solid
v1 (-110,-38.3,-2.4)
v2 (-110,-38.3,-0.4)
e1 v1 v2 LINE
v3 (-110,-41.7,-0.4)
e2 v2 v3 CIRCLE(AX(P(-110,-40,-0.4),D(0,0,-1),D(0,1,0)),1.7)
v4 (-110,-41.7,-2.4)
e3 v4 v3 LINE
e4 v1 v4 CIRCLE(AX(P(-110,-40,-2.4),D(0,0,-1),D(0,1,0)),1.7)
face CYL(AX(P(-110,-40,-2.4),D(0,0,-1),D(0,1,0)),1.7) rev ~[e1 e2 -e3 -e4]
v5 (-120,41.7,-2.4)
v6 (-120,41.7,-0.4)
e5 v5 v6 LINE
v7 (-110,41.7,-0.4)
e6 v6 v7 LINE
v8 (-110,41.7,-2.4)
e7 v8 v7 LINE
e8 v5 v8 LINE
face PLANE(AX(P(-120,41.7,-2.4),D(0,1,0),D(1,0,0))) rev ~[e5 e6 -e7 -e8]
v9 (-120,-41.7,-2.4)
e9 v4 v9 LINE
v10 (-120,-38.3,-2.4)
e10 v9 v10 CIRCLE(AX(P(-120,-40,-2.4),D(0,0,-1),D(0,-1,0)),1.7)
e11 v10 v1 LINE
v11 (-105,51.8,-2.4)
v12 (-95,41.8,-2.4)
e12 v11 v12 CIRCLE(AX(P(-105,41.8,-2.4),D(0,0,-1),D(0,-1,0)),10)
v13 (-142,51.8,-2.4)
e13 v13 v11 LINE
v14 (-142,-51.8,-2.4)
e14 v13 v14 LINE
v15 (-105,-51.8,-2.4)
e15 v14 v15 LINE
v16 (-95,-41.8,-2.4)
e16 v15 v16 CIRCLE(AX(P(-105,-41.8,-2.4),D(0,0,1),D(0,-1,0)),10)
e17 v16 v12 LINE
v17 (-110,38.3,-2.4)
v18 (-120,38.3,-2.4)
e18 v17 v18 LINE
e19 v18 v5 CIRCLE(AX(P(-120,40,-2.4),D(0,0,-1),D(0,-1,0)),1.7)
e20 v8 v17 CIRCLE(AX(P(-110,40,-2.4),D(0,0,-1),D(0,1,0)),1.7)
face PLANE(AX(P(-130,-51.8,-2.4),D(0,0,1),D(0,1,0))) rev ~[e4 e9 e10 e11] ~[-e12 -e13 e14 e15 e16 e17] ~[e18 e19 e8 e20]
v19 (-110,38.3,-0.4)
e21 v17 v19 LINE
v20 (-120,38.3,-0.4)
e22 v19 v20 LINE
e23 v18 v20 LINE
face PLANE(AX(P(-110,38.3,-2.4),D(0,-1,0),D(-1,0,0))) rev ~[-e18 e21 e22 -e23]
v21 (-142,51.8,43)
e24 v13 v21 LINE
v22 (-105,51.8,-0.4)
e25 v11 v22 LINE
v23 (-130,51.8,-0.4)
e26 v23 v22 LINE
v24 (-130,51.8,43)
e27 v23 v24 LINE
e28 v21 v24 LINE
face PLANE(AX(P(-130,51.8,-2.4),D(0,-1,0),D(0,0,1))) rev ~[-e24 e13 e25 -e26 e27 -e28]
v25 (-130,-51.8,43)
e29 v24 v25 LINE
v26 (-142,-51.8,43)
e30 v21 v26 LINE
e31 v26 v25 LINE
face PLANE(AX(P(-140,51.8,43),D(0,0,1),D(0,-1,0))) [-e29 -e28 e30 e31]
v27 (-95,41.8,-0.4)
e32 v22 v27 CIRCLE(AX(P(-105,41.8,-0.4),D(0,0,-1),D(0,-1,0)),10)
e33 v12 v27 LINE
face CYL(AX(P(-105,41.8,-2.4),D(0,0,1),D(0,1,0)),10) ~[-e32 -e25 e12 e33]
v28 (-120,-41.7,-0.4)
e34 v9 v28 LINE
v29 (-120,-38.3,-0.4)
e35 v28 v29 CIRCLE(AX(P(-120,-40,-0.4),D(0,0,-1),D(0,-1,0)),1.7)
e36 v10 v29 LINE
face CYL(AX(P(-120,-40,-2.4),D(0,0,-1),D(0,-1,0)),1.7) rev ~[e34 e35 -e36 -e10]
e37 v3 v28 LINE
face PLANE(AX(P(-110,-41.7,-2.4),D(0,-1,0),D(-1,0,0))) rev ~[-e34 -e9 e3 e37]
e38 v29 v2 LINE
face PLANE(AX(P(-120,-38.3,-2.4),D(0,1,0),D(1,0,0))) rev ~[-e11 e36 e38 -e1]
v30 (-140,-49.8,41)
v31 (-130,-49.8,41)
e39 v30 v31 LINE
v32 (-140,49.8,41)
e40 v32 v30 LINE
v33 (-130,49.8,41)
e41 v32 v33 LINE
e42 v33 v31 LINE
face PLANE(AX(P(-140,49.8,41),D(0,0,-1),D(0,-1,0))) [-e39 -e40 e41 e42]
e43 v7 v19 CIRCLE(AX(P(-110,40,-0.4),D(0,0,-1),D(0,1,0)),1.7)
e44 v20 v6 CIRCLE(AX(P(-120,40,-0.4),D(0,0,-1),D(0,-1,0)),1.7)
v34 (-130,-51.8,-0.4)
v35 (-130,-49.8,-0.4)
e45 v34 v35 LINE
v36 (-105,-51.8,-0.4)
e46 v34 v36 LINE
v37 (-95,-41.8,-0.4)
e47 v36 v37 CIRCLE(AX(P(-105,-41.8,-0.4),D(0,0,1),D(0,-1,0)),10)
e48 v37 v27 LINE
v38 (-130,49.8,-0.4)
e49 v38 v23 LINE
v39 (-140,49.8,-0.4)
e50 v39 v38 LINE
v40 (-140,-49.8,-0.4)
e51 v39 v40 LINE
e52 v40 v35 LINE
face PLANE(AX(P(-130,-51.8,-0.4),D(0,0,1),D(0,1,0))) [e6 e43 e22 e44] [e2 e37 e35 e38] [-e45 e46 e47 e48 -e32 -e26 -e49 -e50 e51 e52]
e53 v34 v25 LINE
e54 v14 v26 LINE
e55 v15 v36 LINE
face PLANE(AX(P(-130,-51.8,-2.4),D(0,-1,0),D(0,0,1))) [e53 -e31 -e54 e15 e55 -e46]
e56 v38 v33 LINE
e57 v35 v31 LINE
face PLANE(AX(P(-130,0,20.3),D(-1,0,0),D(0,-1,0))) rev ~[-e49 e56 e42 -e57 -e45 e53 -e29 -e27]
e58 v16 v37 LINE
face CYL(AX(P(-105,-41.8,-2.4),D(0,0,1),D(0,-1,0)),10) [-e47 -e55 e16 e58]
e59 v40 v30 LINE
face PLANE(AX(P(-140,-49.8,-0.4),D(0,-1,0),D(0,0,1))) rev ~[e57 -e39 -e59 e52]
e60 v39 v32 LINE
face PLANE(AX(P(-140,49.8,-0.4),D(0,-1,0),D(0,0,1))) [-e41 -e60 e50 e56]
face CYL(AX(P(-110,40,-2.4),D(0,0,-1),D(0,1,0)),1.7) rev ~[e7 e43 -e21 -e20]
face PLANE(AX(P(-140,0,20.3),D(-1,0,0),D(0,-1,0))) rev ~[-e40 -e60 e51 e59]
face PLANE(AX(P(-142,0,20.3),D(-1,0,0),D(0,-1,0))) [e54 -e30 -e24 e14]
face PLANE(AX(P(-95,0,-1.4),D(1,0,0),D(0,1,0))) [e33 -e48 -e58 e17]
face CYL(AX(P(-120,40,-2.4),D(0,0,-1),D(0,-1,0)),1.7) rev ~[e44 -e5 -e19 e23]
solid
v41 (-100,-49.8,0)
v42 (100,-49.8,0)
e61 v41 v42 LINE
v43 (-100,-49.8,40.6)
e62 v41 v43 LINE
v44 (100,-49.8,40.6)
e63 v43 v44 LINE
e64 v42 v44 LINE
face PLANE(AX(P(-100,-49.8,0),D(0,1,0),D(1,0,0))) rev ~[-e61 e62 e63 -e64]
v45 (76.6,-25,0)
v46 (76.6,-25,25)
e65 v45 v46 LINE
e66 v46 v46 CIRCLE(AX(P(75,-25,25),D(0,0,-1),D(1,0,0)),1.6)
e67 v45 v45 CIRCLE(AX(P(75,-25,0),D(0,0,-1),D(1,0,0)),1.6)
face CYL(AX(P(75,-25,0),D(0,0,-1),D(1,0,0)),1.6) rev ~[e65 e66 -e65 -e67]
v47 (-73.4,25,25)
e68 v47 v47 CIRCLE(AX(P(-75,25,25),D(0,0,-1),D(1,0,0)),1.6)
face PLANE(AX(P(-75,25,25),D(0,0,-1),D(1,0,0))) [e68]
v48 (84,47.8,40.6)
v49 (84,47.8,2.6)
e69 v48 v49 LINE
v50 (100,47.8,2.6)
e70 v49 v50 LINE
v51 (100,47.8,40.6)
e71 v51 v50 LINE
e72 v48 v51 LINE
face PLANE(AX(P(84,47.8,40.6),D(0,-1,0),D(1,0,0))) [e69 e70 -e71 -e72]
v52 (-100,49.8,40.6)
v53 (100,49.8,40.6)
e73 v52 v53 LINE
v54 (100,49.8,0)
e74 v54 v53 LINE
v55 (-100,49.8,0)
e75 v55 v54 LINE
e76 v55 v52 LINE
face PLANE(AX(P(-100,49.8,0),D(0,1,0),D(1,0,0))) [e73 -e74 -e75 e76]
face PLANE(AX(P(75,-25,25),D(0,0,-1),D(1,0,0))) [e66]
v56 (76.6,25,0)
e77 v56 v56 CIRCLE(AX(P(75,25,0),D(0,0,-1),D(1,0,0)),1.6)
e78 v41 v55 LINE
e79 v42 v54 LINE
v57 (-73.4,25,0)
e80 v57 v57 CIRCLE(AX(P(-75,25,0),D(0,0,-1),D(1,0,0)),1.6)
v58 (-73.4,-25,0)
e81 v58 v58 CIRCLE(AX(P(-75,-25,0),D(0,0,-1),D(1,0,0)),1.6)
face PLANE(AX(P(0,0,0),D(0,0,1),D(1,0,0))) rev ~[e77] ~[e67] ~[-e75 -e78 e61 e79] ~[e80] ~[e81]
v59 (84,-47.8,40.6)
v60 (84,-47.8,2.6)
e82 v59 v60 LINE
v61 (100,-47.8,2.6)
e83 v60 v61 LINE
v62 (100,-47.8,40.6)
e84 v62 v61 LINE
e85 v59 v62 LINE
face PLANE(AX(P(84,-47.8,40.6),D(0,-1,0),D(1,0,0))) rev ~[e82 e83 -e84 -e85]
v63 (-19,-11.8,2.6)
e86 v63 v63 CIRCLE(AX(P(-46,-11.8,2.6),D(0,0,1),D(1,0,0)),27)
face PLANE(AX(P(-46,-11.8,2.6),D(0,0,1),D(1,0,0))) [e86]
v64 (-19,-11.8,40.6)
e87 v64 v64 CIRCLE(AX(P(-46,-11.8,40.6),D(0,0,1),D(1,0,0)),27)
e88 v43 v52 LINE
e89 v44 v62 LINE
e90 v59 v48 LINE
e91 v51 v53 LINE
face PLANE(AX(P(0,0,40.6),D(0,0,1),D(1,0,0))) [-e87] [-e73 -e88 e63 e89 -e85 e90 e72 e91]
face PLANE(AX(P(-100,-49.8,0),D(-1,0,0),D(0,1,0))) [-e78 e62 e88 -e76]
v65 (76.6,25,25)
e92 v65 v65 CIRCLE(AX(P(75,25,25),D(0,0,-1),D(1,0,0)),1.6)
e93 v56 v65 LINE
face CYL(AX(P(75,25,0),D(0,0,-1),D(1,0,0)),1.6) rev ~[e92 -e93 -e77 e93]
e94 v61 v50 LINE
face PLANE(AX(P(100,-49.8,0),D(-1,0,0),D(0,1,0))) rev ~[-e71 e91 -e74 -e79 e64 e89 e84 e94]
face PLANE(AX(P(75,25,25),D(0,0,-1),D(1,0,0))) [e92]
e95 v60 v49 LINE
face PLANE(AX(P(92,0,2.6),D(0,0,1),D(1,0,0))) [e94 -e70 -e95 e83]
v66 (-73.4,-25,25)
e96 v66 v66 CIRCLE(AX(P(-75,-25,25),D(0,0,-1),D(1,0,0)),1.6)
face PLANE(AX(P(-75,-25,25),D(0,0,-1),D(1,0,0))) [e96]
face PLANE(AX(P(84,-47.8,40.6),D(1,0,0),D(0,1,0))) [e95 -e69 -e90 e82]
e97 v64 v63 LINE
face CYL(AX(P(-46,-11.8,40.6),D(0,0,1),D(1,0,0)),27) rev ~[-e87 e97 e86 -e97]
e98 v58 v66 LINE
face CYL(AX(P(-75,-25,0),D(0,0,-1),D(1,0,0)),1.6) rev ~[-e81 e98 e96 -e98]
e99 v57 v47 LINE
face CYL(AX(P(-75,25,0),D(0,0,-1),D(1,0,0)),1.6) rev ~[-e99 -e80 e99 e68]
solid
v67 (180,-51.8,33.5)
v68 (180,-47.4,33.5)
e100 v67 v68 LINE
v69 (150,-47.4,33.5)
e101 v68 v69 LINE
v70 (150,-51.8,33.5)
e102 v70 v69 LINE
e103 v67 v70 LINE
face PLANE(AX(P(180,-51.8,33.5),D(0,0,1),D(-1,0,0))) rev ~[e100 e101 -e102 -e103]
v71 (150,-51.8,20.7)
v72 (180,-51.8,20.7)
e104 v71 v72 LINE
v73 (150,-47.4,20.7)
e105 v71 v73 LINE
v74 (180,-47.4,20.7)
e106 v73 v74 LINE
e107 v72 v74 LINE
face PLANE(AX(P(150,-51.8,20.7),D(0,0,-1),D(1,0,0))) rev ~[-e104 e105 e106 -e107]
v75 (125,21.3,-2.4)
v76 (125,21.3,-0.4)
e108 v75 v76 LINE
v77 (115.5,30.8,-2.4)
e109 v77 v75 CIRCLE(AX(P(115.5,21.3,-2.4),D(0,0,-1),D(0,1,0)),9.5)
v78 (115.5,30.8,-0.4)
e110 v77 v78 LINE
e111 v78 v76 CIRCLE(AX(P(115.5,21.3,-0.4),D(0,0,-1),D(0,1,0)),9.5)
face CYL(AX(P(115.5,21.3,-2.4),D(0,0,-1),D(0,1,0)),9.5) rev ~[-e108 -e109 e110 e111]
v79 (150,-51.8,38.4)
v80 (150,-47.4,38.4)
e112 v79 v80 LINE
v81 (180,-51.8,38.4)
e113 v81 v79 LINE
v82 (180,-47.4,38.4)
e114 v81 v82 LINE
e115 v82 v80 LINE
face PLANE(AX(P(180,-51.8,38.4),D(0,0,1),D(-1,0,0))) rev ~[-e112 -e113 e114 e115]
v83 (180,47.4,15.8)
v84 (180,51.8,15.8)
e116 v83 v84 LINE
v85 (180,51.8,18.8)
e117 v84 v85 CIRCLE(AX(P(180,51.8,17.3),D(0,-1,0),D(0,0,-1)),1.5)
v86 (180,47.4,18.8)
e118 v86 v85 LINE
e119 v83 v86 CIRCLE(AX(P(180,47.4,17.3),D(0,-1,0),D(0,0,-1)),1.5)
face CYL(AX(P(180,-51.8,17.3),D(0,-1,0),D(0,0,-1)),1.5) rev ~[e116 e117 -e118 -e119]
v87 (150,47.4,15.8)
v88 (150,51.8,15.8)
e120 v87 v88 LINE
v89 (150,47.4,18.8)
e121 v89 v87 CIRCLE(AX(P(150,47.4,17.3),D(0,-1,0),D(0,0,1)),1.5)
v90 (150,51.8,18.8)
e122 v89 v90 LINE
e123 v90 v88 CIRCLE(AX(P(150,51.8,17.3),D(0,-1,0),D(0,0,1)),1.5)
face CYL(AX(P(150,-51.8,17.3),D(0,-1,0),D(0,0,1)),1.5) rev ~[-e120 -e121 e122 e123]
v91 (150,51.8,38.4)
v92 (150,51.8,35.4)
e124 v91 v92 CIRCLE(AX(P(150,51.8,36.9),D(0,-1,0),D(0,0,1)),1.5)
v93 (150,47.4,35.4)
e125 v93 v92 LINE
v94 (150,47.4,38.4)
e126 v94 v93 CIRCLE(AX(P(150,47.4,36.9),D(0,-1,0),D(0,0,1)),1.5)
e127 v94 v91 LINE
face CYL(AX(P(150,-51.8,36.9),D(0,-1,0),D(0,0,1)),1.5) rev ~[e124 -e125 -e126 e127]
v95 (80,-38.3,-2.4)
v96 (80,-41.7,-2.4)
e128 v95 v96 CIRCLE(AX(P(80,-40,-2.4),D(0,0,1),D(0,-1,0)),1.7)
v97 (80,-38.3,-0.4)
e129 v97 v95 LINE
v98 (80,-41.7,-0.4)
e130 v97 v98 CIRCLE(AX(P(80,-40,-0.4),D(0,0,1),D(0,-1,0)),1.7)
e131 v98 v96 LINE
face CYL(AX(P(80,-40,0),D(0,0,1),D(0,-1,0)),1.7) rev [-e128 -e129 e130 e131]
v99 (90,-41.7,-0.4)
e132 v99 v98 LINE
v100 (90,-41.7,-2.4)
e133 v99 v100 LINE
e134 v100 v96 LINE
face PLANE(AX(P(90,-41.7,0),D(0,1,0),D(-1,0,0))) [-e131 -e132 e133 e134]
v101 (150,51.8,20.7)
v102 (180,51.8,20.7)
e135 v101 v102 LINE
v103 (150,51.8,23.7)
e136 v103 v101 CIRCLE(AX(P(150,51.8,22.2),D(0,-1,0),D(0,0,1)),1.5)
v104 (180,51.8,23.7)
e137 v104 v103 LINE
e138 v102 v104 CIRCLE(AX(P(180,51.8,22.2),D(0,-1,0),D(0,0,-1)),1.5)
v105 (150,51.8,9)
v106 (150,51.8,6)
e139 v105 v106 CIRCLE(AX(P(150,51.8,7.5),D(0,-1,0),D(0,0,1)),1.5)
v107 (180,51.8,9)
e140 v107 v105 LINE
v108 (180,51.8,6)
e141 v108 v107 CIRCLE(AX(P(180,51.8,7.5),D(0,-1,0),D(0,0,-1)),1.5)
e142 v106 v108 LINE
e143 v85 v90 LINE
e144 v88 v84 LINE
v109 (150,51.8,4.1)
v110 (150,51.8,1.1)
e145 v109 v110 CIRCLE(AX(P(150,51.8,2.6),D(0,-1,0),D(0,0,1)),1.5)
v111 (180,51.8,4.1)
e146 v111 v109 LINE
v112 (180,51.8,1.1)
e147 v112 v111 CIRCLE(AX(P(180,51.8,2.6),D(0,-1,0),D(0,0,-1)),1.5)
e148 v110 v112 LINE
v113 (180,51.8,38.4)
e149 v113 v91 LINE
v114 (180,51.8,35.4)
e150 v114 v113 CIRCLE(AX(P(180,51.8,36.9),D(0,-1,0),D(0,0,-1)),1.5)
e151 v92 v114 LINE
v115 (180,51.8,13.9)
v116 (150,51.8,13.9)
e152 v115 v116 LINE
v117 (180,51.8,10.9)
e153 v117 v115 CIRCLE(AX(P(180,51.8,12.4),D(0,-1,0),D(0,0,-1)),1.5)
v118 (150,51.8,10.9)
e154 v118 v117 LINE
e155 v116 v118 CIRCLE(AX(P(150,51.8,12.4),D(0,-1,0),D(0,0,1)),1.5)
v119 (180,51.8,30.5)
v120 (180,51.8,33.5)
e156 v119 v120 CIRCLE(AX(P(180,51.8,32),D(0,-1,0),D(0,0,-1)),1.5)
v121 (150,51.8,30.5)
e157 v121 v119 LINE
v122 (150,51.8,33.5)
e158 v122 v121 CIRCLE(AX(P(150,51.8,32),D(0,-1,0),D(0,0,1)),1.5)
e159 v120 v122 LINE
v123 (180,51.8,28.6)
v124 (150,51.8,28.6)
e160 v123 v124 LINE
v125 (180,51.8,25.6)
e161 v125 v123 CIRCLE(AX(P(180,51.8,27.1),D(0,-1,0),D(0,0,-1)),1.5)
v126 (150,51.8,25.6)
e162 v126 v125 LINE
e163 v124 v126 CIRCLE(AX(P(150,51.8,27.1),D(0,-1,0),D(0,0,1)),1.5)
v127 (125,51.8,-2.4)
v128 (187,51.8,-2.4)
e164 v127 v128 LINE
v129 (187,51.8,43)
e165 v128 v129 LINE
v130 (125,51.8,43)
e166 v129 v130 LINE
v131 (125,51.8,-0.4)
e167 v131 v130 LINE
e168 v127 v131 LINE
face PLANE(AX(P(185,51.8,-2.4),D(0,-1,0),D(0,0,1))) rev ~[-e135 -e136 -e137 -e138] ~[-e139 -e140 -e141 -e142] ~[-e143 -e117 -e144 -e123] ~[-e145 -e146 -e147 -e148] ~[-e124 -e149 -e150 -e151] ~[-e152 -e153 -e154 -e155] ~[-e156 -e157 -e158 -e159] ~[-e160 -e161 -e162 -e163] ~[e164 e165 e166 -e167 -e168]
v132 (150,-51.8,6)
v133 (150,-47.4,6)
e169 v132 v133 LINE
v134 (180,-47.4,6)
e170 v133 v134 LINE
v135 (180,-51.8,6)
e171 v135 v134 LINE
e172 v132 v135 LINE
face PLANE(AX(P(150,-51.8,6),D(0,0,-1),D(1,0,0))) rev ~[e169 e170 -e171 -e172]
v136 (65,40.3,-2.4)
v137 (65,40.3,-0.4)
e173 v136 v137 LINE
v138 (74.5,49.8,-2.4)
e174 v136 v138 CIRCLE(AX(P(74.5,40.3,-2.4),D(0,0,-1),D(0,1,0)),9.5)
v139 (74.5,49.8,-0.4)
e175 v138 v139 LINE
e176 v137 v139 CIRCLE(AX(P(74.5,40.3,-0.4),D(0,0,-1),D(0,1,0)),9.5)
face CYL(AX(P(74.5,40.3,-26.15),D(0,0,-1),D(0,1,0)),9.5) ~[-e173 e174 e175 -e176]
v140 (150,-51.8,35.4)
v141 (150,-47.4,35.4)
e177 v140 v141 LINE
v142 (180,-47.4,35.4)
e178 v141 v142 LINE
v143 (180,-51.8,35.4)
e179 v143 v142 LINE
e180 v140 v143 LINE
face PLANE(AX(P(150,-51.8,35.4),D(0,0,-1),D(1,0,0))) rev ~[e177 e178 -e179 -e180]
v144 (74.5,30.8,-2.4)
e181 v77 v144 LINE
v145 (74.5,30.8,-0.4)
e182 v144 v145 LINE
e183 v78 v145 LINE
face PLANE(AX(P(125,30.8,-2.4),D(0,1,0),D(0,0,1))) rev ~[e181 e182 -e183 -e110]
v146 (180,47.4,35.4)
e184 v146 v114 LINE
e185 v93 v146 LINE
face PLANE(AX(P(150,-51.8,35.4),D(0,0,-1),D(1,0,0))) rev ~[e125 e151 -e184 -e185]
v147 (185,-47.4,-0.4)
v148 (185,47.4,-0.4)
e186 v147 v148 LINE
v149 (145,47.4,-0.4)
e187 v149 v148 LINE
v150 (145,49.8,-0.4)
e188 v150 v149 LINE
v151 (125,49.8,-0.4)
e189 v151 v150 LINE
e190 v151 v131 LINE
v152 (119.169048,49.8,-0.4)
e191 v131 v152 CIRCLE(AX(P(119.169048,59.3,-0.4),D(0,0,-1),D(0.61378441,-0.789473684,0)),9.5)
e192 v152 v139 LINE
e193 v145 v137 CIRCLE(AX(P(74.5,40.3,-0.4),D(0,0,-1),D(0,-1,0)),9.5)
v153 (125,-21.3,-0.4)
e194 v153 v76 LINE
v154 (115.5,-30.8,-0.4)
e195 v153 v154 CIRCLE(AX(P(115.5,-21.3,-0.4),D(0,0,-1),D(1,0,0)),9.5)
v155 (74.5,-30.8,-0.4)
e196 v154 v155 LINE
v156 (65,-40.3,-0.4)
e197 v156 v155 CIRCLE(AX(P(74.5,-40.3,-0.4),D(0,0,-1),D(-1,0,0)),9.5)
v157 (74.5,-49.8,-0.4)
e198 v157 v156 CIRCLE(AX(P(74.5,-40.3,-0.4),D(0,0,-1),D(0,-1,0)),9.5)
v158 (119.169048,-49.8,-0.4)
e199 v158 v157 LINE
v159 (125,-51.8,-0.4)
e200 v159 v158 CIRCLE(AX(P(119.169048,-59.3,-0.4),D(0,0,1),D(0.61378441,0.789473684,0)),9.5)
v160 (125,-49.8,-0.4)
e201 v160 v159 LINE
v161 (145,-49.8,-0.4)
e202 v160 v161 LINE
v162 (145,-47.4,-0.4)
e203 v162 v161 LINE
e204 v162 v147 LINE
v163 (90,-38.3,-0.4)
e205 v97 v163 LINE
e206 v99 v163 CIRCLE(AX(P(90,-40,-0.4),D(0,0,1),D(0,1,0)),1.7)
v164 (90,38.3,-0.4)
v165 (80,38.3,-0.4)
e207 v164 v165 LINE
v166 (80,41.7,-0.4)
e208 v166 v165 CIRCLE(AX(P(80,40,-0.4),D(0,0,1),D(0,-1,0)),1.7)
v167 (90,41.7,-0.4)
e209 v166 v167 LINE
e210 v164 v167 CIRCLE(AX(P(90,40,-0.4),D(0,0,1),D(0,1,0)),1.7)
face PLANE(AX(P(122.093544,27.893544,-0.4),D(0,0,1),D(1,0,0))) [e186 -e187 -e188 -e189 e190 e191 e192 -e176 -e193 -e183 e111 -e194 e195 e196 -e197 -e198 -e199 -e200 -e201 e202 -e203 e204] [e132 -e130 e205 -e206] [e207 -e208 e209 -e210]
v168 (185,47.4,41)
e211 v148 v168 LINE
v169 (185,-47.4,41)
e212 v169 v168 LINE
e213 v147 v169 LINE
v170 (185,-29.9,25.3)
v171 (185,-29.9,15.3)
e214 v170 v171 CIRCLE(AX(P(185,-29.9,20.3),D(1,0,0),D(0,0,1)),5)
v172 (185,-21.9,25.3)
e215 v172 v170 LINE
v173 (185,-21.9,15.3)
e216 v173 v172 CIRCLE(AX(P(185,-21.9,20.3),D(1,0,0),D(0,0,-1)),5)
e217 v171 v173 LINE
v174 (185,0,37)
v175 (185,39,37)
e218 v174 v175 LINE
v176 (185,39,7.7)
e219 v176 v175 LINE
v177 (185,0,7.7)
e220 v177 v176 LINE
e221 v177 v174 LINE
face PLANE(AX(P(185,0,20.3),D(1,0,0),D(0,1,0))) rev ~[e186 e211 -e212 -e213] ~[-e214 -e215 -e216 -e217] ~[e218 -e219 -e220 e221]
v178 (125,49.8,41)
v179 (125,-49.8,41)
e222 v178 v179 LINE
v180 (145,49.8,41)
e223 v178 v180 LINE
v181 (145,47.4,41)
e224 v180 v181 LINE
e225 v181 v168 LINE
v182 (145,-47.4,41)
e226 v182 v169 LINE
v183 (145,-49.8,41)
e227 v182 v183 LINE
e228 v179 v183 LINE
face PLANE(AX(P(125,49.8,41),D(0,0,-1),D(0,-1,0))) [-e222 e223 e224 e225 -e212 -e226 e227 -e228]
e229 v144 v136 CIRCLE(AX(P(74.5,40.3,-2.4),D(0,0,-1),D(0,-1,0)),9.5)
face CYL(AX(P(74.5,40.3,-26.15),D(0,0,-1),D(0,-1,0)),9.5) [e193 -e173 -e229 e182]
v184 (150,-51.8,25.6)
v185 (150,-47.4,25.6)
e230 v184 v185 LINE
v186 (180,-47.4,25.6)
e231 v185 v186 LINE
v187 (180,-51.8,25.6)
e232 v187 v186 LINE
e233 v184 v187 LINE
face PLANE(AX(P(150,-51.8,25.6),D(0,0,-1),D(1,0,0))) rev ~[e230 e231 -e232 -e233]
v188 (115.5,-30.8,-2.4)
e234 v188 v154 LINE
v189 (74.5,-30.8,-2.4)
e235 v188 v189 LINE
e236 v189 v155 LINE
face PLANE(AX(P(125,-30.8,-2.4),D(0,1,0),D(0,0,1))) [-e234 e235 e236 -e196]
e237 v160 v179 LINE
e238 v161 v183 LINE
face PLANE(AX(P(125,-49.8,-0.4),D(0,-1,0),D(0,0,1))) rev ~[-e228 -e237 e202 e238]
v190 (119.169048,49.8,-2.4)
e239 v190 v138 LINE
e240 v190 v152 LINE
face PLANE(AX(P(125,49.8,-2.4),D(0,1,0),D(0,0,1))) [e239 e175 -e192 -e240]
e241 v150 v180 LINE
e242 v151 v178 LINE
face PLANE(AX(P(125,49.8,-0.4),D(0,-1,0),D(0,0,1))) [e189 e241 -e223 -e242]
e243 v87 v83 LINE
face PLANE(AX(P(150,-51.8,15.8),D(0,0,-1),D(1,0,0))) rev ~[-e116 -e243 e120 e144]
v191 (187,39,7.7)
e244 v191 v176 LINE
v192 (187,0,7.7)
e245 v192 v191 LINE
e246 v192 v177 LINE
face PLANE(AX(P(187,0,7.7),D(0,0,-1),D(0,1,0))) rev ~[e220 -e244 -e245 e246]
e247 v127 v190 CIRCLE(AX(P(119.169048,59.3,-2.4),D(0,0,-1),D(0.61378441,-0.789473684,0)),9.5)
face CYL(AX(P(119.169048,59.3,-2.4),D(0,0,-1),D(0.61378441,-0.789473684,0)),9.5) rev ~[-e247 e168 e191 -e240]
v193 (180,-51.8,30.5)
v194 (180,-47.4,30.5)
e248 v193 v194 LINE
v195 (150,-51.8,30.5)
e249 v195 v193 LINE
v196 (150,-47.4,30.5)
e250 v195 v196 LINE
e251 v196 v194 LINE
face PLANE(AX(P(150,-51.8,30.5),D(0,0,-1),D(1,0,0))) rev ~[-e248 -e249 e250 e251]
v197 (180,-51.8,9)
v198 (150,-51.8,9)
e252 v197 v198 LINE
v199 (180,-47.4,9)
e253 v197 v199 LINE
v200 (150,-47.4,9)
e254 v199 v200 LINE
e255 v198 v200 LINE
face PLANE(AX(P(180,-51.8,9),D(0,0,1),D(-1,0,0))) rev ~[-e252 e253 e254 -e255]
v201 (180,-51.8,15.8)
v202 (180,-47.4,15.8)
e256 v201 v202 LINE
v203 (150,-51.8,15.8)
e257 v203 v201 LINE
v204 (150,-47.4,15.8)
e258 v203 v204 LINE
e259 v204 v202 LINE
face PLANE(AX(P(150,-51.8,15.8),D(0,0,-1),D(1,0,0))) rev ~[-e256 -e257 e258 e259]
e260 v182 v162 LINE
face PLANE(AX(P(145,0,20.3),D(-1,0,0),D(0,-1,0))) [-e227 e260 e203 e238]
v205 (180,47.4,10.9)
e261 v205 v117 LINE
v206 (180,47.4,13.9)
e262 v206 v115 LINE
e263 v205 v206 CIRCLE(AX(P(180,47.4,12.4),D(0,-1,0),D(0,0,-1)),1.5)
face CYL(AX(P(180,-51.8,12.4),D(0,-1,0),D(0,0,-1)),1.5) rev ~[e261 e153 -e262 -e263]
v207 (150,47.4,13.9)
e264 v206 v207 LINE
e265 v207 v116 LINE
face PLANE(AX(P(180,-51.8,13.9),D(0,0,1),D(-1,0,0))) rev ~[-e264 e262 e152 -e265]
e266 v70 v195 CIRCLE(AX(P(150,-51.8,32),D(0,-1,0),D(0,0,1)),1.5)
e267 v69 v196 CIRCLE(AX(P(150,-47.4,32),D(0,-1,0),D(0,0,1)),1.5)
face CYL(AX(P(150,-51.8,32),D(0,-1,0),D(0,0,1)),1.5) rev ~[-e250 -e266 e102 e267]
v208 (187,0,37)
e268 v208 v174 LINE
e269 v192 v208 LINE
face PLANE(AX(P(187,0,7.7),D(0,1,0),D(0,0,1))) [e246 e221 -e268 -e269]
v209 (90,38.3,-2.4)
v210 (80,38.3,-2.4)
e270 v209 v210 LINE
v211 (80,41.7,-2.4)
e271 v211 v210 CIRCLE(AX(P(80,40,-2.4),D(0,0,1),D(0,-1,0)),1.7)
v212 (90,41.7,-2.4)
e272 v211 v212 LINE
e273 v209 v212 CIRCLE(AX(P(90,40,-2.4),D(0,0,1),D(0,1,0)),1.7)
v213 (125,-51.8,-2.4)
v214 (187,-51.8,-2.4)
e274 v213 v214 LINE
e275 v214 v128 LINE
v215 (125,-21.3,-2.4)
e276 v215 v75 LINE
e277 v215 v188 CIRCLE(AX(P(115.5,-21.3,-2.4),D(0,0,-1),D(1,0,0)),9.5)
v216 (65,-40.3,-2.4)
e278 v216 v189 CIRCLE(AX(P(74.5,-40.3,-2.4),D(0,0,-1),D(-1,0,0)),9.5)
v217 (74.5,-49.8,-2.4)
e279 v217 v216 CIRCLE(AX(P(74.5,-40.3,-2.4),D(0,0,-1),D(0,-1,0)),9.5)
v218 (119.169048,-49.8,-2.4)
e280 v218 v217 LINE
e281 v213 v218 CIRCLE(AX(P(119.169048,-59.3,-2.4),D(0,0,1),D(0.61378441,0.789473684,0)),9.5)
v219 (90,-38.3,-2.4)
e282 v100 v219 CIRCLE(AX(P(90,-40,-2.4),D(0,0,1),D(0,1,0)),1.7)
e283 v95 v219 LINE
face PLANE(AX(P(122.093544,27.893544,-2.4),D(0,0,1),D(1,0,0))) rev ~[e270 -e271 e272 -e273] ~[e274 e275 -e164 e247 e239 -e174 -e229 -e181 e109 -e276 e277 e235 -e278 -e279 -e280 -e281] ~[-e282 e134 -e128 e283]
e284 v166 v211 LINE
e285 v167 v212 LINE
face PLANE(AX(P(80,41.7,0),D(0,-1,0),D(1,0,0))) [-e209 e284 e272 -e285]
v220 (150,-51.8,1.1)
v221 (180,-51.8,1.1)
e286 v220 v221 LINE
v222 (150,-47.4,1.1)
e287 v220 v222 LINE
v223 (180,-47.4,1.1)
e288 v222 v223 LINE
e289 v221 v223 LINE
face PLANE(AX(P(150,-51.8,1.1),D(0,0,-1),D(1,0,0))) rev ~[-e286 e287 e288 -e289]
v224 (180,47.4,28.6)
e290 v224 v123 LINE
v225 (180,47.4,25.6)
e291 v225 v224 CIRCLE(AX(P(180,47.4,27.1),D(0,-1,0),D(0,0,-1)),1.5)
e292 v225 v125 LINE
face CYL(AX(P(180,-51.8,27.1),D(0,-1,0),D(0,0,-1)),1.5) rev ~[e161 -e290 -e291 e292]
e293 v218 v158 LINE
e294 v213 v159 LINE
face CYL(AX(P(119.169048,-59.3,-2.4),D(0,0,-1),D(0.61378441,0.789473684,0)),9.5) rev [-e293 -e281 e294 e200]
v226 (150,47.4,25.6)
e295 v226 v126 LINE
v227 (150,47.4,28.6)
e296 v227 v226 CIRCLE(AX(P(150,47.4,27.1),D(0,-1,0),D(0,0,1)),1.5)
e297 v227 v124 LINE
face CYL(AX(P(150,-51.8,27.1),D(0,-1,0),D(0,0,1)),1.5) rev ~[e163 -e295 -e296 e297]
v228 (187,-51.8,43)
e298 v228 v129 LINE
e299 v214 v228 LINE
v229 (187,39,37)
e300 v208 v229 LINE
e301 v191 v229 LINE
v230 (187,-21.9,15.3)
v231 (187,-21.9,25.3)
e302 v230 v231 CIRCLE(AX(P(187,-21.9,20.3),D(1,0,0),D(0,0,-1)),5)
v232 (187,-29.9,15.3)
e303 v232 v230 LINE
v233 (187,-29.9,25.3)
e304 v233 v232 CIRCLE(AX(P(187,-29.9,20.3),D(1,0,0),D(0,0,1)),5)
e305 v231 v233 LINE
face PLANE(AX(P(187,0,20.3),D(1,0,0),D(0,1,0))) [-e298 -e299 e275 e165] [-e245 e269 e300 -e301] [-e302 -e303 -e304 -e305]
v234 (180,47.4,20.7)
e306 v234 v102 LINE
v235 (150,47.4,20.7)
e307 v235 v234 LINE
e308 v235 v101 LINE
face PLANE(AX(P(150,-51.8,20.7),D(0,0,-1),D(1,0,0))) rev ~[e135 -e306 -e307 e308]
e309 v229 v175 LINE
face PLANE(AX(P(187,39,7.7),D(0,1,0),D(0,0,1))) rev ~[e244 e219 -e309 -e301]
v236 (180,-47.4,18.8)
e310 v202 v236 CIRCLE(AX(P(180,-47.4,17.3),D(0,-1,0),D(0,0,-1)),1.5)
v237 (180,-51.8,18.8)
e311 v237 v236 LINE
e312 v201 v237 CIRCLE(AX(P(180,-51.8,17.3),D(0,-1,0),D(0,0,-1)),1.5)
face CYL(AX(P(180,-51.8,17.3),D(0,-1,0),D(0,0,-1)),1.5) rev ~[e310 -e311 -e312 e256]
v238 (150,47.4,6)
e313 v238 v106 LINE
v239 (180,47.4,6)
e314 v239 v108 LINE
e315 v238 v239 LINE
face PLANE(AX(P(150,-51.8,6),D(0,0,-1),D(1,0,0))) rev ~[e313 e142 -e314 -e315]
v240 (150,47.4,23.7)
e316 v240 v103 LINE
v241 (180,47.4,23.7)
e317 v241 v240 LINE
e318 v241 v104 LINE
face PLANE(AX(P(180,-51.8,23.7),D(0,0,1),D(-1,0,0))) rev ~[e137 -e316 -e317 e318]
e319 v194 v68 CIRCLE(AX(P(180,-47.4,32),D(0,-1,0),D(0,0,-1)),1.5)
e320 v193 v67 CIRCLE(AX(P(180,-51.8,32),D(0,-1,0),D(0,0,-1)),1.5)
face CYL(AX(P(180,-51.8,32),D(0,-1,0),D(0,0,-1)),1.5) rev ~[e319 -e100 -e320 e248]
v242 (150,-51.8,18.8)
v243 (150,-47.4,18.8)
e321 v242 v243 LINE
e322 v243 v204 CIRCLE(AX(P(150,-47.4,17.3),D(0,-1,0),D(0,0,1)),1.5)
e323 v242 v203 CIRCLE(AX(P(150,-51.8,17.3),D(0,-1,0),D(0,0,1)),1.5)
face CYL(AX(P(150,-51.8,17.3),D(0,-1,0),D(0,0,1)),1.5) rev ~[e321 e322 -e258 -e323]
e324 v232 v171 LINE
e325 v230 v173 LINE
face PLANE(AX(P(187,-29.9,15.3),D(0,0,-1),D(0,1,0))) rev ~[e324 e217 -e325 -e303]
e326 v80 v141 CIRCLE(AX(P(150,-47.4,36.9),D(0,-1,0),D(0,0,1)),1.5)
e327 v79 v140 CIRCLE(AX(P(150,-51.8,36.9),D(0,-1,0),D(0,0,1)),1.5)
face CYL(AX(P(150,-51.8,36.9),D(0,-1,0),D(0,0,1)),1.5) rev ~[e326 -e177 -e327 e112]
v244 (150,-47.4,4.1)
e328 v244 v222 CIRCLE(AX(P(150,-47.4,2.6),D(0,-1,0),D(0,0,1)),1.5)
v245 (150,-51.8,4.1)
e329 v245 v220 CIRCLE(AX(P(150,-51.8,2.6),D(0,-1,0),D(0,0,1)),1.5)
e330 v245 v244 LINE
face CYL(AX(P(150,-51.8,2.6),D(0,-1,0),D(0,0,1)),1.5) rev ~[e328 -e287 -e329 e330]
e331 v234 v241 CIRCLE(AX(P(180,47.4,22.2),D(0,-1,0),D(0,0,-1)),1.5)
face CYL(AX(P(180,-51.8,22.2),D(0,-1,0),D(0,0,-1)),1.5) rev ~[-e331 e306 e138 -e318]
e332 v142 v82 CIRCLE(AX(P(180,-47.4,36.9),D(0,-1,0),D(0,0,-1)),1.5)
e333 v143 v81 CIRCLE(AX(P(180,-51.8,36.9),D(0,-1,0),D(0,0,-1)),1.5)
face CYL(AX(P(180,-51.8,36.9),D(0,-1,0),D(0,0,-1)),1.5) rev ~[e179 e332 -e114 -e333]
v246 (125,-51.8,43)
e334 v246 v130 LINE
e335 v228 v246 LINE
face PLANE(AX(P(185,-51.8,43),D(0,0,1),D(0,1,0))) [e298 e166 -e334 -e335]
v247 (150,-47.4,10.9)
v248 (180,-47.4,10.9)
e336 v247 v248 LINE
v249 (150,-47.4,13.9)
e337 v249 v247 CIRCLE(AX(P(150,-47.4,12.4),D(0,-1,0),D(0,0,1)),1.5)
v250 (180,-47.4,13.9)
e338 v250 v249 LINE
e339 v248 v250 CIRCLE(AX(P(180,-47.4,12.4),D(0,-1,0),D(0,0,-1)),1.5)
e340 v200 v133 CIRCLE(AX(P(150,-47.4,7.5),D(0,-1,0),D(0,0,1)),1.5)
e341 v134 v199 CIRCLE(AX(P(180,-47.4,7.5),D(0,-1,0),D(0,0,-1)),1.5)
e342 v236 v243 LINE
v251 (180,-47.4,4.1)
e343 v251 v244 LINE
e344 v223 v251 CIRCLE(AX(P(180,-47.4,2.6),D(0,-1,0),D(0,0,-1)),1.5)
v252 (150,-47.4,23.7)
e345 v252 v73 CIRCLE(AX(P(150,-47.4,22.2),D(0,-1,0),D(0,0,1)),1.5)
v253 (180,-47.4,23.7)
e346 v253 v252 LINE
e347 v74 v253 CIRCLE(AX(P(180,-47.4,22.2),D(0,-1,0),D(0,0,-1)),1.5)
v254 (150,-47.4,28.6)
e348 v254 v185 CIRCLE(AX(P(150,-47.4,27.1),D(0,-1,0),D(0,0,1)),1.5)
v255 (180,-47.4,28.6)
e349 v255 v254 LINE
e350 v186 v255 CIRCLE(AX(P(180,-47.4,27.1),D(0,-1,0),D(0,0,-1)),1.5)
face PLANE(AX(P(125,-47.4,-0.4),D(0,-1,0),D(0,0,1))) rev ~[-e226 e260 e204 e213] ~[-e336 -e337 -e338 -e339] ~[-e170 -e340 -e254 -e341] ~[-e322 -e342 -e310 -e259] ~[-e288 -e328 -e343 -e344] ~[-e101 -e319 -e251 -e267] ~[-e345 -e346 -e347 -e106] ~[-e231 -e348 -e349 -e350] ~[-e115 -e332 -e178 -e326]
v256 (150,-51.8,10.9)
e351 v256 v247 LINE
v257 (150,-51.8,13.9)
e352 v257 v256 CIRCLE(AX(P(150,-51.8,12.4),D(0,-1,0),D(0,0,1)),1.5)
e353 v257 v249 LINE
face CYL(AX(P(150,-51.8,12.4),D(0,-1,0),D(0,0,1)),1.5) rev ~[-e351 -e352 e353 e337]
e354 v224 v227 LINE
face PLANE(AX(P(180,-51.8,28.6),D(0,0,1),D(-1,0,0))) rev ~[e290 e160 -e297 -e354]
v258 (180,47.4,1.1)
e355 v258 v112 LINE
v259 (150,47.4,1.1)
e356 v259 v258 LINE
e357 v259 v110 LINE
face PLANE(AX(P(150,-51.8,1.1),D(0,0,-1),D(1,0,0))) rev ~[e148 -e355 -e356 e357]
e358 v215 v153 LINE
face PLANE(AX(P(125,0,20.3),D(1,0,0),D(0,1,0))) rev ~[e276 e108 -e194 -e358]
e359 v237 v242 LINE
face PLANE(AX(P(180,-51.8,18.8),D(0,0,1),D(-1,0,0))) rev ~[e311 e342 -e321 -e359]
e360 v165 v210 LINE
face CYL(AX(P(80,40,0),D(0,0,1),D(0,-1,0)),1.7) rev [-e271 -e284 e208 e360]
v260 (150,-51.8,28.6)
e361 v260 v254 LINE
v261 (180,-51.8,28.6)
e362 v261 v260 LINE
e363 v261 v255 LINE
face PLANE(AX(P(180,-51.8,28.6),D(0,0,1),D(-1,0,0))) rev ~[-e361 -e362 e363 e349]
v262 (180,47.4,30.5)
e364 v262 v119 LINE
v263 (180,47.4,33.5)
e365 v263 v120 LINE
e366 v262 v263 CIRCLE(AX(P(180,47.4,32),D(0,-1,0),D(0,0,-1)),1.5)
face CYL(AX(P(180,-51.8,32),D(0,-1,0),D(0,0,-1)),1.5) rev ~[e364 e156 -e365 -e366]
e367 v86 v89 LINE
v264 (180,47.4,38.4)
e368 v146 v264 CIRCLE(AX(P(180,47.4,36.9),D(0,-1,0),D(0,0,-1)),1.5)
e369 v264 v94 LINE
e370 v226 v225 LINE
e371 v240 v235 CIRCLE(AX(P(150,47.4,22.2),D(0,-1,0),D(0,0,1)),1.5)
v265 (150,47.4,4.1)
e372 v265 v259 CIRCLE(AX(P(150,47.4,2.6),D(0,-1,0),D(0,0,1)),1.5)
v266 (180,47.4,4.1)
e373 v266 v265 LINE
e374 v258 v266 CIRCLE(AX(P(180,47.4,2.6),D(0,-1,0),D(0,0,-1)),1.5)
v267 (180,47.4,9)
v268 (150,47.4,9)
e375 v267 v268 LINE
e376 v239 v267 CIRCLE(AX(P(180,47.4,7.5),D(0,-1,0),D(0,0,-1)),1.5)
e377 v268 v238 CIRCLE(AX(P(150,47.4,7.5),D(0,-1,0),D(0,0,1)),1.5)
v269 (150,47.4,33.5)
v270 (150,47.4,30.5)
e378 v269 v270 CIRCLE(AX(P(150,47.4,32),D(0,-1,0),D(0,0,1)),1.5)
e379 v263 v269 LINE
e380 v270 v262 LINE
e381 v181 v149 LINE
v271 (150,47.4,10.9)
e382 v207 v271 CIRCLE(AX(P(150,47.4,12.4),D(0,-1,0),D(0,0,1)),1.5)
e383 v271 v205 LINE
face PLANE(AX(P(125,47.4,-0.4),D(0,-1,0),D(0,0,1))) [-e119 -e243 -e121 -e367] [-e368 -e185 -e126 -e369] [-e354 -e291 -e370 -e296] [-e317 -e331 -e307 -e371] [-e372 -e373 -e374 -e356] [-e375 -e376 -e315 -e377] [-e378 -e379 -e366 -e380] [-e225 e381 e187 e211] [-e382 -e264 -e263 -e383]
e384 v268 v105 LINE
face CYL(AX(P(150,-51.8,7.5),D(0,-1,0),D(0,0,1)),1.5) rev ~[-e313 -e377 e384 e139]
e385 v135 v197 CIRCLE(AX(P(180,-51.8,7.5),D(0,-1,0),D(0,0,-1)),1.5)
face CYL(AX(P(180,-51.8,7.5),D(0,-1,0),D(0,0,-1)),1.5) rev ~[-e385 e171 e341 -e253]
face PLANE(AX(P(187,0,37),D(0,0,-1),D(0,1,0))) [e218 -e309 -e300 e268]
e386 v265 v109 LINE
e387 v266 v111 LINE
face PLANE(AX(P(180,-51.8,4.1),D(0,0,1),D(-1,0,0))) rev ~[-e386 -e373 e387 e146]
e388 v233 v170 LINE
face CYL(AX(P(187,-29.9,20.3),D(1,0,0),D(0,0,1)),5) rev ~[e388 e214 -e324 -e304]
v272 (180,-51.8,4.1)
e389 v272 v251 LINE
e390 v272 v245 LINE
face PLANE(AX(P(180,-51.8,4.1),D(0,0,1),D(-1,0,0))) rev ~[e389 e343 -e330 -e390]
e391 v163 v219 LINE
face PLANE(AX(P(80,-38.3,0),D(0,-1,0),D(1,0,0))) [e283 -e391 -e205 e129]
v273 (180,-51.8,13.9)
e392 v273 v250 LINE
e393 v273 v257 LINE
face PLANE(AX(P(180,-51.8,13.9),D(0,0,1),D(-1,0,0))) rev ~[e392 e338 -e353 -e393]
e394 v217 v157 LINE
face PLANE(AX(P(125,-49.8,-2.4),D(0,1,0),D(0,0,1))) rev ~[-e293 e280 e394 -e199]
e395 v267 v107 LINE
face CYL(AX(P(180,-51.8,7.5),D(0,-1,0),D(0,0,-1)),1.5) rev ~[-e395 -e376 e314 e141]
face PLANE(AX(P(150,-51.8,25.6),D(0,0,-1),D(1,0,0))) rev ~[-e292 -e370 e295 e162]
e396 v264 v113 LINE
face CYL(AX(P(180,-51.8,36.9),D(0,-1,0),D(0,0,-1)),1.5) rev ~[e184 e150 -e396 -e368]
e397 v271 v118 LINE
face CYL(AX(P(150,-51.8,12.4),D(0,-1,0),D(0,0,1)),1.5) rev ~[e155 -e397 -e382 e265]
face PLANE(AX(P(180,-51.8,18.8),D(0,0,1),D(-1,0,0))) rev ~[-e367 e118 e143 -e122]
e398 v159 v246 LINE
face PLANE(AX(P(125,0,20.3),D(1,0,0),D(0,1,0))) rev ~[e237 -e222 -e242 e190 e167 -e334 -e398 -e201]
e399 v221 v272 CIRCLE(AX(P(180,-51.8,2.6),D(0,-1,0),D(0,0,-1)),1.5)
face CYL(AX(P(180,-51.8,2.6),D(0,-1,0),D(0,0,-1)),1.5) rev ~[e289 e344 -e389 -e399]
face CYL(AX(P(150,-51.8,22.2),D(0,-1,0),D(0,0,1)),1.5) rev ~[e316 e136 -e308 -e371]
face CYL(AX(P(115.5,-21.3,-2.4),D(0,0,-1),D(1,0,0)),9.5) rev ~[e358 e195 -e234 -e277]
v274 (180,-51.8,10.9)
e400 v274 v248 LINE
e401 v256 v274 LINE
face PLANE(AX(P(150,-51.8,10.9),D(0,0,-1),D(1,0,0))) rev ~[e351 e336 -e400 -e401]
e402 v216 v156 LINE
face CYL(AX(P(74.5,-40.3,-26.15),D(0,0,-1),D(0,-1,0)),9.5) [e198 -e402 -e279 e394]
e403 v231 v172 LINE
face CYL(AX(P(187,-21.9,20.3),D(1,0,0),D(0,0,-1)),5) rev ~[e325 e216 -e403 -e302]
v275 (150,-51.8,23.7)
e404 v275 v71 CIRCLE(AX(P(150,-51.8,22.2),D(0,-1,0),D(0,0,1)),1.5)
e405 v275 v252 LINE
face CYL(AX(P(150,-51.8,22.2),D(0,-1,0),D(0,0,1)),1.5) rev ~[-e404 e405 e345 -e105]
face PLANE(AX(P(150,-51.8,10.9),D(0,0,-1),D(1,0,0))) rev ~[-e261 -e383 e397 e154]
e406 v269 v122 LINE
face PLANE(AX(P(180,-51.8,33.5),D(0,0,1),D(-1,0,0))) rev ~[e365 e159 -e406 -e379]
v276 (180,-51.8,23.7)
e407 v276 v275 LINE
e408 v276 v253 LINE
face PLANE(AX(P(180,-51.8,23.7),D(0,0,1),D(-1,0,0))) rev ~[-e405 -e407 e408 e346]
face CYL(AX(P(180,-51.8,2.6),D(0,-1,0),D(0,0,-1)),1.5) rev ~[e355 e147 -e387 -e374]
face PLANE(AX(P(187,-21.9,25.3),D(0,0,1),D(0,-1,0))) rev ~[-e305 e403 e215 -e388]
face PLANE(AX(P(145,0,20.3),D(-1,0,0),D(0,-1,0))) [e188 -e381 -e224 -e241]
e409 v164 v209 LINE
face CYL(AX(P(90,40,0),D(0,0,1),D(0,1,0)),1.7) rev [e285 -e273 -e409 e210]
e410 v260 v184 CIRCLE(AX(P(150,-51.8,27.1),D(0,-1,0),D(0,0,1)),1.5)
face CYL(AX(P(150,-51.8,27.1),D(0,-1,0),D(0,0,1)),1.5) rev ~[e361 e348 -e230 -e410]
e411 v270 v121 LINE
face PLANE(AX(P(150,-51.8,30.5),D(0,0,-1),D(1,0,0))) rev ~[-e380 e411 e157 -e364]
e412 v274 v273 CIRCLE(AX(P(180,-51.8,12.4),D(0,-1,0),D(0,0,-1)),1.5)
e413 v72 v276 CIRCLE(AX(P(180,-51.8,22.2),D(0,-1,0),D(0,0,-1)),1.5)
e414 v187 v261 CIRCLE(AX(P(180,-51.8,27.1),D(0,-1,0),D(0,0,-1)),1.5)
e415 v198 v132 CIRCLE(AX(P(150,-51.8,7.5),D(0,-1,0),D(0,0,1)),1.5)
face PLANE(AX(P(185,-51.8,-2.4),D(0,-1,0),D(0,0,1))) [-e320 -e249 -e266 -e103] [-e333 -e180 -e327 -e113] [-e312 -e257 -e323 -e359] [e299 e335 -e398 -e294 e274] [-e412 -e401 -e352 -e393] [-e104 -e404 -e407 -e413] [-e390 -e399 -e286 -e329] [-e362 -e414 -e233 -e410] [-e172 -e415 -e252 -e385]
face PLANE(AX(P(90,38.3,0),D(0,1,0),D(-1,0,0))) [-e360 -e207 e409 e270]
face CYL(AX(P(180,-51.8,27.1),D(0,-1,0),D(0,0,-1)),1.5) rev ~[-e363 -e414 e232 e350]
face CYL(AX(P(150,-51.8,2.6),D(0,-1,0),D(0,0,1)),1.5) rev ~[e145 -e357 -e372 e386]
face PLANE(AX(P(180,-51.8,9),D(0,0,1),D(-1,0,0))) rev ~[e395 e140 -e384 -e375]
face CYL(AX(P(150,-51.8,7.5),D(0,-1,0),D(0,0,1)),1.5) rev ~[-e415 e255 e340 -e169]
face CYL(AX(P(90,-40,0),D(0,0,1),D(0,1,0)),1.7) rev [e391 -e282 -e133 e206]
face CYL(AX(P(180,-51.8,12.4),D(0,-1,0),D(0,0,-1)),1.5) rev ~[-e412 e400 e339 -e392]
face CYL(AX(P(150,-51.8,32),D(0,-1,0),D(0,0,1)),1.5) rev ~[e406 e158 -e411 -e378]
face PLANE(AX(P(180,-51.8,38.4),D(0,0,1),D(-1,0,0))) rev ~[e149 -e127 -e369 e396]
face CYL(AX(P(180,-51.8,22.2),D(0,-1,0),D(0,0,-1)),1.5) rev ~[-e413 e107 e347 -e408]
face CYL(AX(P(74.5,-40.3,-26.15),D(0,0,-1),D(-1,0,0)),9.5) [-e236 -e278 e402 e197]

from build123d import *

# Parameters (mm, degrees)
F0_W          = 200
F0_H          = 99.6
F1_DEPTH      = 40.6
F2_W          = 16
F2_H          = 95.6
F2_R          = 27
F3_DEPTH      = 38
F4_R          = 1.6
F5_DEPTH      = 25
F7_W          = 103.6
F7_H          = 45.4
F7_W_2        = 94.8
F7_H_2        = 41.4
F8_DEPTH      = 60
F9_W          = 103.6
F9_H          = 45.4
F9_W_2        = 94.8
F9_H_2        = 41.4
F10_DEPTH     = 2
F11_W         = 39
F11_H         = 29.3
F12_DEPTH     = 2
F13_W         = 99.6
F13_H         = 41.4
F14_DEPTH     = 20
F15_W         = 19
F15_H         = 2
F16_DEPTH     = 60
F17_T1_DEPTH  = 2
F17_T3_DEPTH  = 2
F17_T5_DEPTH  = 2
F17_T7_DEPTH  = 2
F17_T9_DEPTH  = 49.5
F17_T11_DEPTH = 49.5
F17_T13_DEPTH = 49.5
F17_T15_DEPTH = 49.5
F19_DEPTH     = 2.401
F21_DEPTH     = 103.601
F23_W         = 103.6
F23_H         = 45.4
F23_W_2       = 99.6
F23_H_2       = 41.4
F24_DEPTH     = 10
F25_W         = 103.6
F25_H         = 45.4
F26_DEPTH     = 2
F27_W         = 103.6
F27_H         = 2
F28_DEPTH     = 35
F29_R         = 10
F31_DEPTH     = 2


# Not quite as in the source:
# - a fillet or chamfer that OpenCascade refuses, or shapes differently, is made with other operations: its cross-section is extruded or revolved along the edge and cut away or added


with BuildPart() as f1:
    # F0 (on Top) → F1 (new body)
    with BuildSketch(Plane.XY):
        Rectangle(F0_W, F0_H)
    extrude(amount=F1_DEPTH)

    # F2 (on face) → F3 (cut)
    with BuildSketch(Plane.XY.offset(40.6)):
        with Locations((92, 0)):
            Rectangle(F2_W, F2_H)
        with Locations((-46, -11.8)):
            Circle(F2_R)
    extrude(amount=-F3_DEPTH, mode=Mode.SUBTRACT)

    # F4 (on face) → F5 (cut)
    with BuildSketch(Plane(origin=(0, 0, 0), x_dir=(1, 0, 0), z_dir=(0, 0, -1))):
        with Locations((-75, 25)):
            Circle(F4_R)
        with Locations((75, 25)):
            Circle(F4_R)
        with Locations((-75, -25)):
            Circle(F4_R)
        with Locations((75, -25)):
            Circle(F4_R)
    extrude(amount=-F5_DEPTH, mode=Mode.SUBTRACT)


with BuildPart() as f8:
    # F7 (on offset) → F8 (new body)
    with BuildSketch(Plane.YZ.offset(125)):
        with Locations((0, 20.3)):
            Rectangle(F7_W, F7_H)
        with Locations((0, 20.3)):
            Rectangle(F7_W_2, F7_H_2, mode=Mode.SUBTRACT)
    extrude(amount=F8_DEPTH)

    # F9 (on face) → F10 (join)
    with BuildSketch(Plane.YZ.offset(185)):
        with Locations((0, 20.3)):
            Rectangle(F9_W, F9_H)
        with Locations((0, 20.3)):
            Rectangle(F9_W_2, F9_H_2, mode=Mode.SUBTRACT)
        with Locations((0, 20.3)):
            Rectangle(F9_W_2, F9_H_2)
    extrude(amount=F10_DEPTH)

    # F11 (on face) → F12 (cut, through all)
    with BuildSketch(Plane.YZ.offset(187)):
        with Locations((19.5, 22.35)):
            Rectangle(F11_W, F11_H)
        with BuildLine():
            ThreePointArc((-29.9, 25.3), (-34.9, 20.3), (-29.9, 15.3))
            Line((-29.9, 15.3), (-21.9, 15.3))
            ThreePointArc((-21.9, 15.3), (-16.9, 20.3), (-21.9, 25.3))
            Line((-21.9, 25.3), (-29.9, 25.3))
        make_face()
    extrude(amount=-F12_DEPTH, mode=Mode.SUBTRACT)

    # F13 (on face) → F14 (cut)
    with BuildSketch(Plane(origin=(125, 0, 0), x_dir=(0, -1, 0), z_dir=(-1, 0, 0))):
        with Locations((0, 20.3)):
            Rectangle(F13_W, F13_H)
    extrude(amount=-F14_DEPTH, mode=Mode.SUBTRACT)

    # F15 (on face) → F16 (join)
    with BuildSketch(Plane(origin=(125, 0, 0), x_dir=(0, -1, 0), z_dir=(-1, 0, 0))):
        with Locations((-40.3, -1.4)):
            Rectangle(F15_W, F15_H)
        with Locations((40.3, -1.4)):
            Rectangle(F15_W, F15_H)
    extrude(amount=F16_DEPTH)

    # F17: fillet of radius 9.5 on 8 edges, made by hand

    # F17_s2 → F17_t1 (join)
    with BuildSketch(Plane.XY.offset(-2.4)):
        with BuildLine():
            ThreePointArc((125, 51.8), (122.2512551066, 50.3138996222), (119.1690481052, 49.8))
            Line((119.1690481052, 49.8), (125, 49.8))
            Line((125, 49.8), (125, 51.8))
        make_face()
    extrude(amount=F17_T1_DEPTH)

    # F17_s4 → F17_t3 (join)
    with BuildSketch(Plane.XY.offset(-2.4)):
        with BuildLine():
            ThreePointArc((125, -51.8), (122.2512551066, -50.3138996222), (119.1690481052, -49.8))
            Line((119.1690481052, -49.8), (125, -49.8))
            Line((125, -49.8), (125, -51.8))
        make_face()
    extrude(amount=F17_T3_DEPTH)

    # F17_s6 → F17_t5 (join)
    with BuildSketch(Plane.XY.offset(-2.4)):
        with BuildLine():
            ThreePointArc((125, -21.3), (122.2175144213, -28.0175144213), (115.5, -30.8))
            Line((115.5, -30.8), (125, -30.8))
            Line((125, -30.8), (125, -21.3))
        make_face()
    extrude(amount=F17_T5_DEPTH)

    # F17_s8 → F17_t7 (join)
    with BuildSketch(Plane.XY.offset(-2.4)):
        with BuildLine():
            ThreePointArc((115.5, 30.8), (122.2175144213, 28.0175144213), (125, 21.3))
            Line((125, 21.3), (125, 30.8))
            Line((125, 30.8), (115.5, 30.8))
        make_face()
    extrude(amount=F17_T7_DEPTH)

    # F17_s10 → F17_t9 (cut)
    with BuildSketch(Plane.XY.offset(-26.15)):
        with BuildLine():
            ThreePointArc((74.5, 49.8), (67.7824855787, 47.0175144213), (65, 40.3))
            Line((65, 40.3), (65, 49.8))
            Line((65, 49.8), (74.5, 49.8))
        make_face()
    extrude(amount=F17_T9_DEPTH, mode=Mode.SUBTRACT)

    # F17_s12 → F17_t11 (cut)
    with BuildSketch(Plane.XY.offset(-26.15)):
        with BuildLine():
            ThreePointArc((74.5, -49.8), (67.7824855787, -47.0175144213), (65, -40.3))
            Line((65, -40.3), (65, -49.8))
            Line((65, -49.8), (74.5, -49.8))
        make_face()
    extrude(amount=F17_T11_DEPTH, mode=Mode.SUBTRACT)

    # F17_s14 → F17_t13 (cut)
    with BuildSketch(Plane.XY.offset(-26.15)):
        with BuildLine():
            ThreePointArc((65, -40.3), (67.7824855787, -33.5824855787), (74.5, -30.8))
            Line((74.5, -30.8), (65, -30.8))
            Line((65, -30.8), (65, -40.3))
        make_face()
    extrude(amount=F17_T13_DEPTH, mode=Mode.SUBTRACT)

    # F17_s16 → F17_t15 (cut)
    with BuildSketch(Plane.XY.offset(-26.15)):
        with BuildLine():
            ThreePointArc((74.5, 30.8), (67.7824855787, 33.5824855787), (65, 40.3))
            Line((65, 40.3), (65, 30.8))
            Line((65, 30.8), (74.5, 30.8))
        make_face()
    extrude(amount=F17_T15_DEPTH, mode=Mode.SUBTRACT)

    # F18 (on face) → F19 (cut, through all)
    with BuildSketch(Plane(origin=(0, 0, 0), x_dir=(1, 0, 0), z_dir=(0, 0, -1))):
        with BuildLine():
            ThreePointArc((80, 41.7), (78.3, 40), (80, 38.3))
            Line((80, 38.3), (90, 38.3))
            ThreePointArc((90, 38.3), (91.7, 40), (90, 41.7))
            Line((90, 41.7), (80, 41.7))
        make_face()
        with BuildLine():
            Line((90, -38.3), (80, -38.3))
            ThreePointArc((80, -38.3), (78.3, -40), (80, -41.7))
            Line((80, -41.7), (90, -41.7))
            ThreePointArc((90, -41.7), (91.7, -40), (90, -38.3))
        make_face()
    extrude(amount=F19_DEPTH, mode=Mode.SUBTRACT)

    # F20 (on face) → F21 (cut, through all)
    with BuildSketch(Plane.XZ.offset(51.8)):
        with BuildLine():
            ThreePointArc((150, 4.1), (148.5, 2.6), (150, 1.1))
            Line((150, 1.1), (180, 1.1))
            ThreePointArc((180, 1.1), (181.5, 2.6), (180, 4.1))
            Line((180, 4.1), (150, 4.1))
        make_face()
        with BuildLine():
            ThreePointArc((150, 9), (148.5, 7.5), (150, 6))
            Line((150, 6), (180, 6))
            ThreePointArc((180, 6), (181.5, 7.5), (180, 9))
            Line((180, 9), (150, 9))
        make_face()
        with BuildLine():
            ThreePointArc((150, 13.9), (148.5, 12.4), (150, 10.9))
            Line((150, 10.9), (180, 10.9))
            ThreePointArc((180, 10.9), (181.5, 12.4), (180, 13.9))
            Line((180, 13.9), (150, 13.9))
        make_face()
        with BuildLine():
            ThreePointArc((150, 18.8), (148.5, 17.3), (150, 15.8))
            Line((150, 15.8), (180, 15.8))
            ThreePointArc((180, 15.8), (181.5, 17.3), (180, 18.8))
            Line((180, 18.8), (150, 18.8))
        make_face()
        with BuildLine():
            ThreePointArc((150, 23.7), (148.5, 22.2), (150, 20.7))
            Line((150, 20.7), (180, 20.7))
            ThreePointArc((180, 20.7), (181.5, 22.2), (180, 23.7))
            Line((180, 23.7), (150, 23.7))
        make_face()
        with BuildLine():
            ThreePointArc((150, 28.6), (148.5, 27.1), (150, 25.6))
            Line((150, 25.6), (180, 25.6))
            ThreePointArc((180, 25.6), (181.5, 27.1), (180, 28.6))
            Line((180, 28.6), (150, 28.6))
        make_face()
        with BuildLine():
            ThreePointArc((150, 33.5), (148.5, 32), (150, 30.5))
            Line((150, 30.5), (180, 30.5))
            ThreePointArc((180, 30.5), (181.5, 32), (180, 33.5))
            Line((180, 33.5), (150, 33.5))
        make_face()
        with BuildLine():
            ThreePointArc((150, 38.4), (148.5, 36.9), (150, 35.4))
            Line((150, 35.4), (180, 35.4))
            ThreePointArc((180, 35.4), (181.5, 36.9), (180, 38.4))
            Line((180, 38.4), (150, 38.4))
        make_face()
    extrude(amount=-F21_DEPTH, mode=Mode.SUBTRACT)


with BuildPart() as f24:
    # F23 (on offset) → F24 (new body)
    with BuildSketch(Plane(origin=(-140, 0, 0), x_dir=(0, -1, 0), z_dir=(-1, 0, 0))):
        with Locations((0, 20.3)):
            Rectangle(F23_W, F23_H)
        with Locations((0, 20.3)):
            Rectangle(F23_W_2, F23_H_2, mode=Mode.SUBTRACT)
    extrude(amount=-F24_DEPTH)

    # F25 (on face) → F26 (join)
    with BuildSketch(Plane(origin=(-140, 0, 0), x_dir=(0, -1, 0), z_dir=(-1, 0, 0))):
        with Locations((0, 20.3)):
            Rectangle(F25_W, F25_H)
    extrude(amount=F26_DEPTH)

    # F27 (on face) → F28 (join)
    with BuildSketch(Plane.YZ.offset(-130)):
        with Locations((0, -1.4)):
            Rectangle(F27_W, F27_H)
    extrude(amount=F28_DEPTH)

    # F29
    f29_edges = [f24.edges().sort_by_distance(p)[0] for p in [
        (-95, -51.8, -1.4),
        (-95, 51.8, -1.4),
    ]]
    fillet(f29_edges, radius=F29_R)

    # F30 (on face) → F31 (cut, through all)
    with BuildSketch(Plane(origin=(0, 0, -2.4), x_dir=(1, 0, 0), z_dir=(0, 0, -1))):
        with BuildLine():
            ThreePointArc((-120, 41.7), (-121.7, 40), (-120, 38.3))
            Line((-120, 38.3), (-110, 38.3))
            ThreePointArc((-110, 38.3), (-108.3, 40), (-110, 41.7))
            Line((-110, 41.7), (-120, 41.7))
        make_face()
        with BuildLine():
            Line((-110, -38.3), (-120, -38.3))
            ThreePointArc((-120, -38.3), (-121.7, -40), (-120, -41.7))
            Line((-120, -41.7), (-110, -41.7))
            ThreePointArc((-110, -41.7), (-108.3, -40), (-110, -38.3))
        make_face()
    extrude(amount=-F31_DEPTH, mode=Mode.SUBTRACT)


solid = Compound([f1.part, f8.part, f24.part])
